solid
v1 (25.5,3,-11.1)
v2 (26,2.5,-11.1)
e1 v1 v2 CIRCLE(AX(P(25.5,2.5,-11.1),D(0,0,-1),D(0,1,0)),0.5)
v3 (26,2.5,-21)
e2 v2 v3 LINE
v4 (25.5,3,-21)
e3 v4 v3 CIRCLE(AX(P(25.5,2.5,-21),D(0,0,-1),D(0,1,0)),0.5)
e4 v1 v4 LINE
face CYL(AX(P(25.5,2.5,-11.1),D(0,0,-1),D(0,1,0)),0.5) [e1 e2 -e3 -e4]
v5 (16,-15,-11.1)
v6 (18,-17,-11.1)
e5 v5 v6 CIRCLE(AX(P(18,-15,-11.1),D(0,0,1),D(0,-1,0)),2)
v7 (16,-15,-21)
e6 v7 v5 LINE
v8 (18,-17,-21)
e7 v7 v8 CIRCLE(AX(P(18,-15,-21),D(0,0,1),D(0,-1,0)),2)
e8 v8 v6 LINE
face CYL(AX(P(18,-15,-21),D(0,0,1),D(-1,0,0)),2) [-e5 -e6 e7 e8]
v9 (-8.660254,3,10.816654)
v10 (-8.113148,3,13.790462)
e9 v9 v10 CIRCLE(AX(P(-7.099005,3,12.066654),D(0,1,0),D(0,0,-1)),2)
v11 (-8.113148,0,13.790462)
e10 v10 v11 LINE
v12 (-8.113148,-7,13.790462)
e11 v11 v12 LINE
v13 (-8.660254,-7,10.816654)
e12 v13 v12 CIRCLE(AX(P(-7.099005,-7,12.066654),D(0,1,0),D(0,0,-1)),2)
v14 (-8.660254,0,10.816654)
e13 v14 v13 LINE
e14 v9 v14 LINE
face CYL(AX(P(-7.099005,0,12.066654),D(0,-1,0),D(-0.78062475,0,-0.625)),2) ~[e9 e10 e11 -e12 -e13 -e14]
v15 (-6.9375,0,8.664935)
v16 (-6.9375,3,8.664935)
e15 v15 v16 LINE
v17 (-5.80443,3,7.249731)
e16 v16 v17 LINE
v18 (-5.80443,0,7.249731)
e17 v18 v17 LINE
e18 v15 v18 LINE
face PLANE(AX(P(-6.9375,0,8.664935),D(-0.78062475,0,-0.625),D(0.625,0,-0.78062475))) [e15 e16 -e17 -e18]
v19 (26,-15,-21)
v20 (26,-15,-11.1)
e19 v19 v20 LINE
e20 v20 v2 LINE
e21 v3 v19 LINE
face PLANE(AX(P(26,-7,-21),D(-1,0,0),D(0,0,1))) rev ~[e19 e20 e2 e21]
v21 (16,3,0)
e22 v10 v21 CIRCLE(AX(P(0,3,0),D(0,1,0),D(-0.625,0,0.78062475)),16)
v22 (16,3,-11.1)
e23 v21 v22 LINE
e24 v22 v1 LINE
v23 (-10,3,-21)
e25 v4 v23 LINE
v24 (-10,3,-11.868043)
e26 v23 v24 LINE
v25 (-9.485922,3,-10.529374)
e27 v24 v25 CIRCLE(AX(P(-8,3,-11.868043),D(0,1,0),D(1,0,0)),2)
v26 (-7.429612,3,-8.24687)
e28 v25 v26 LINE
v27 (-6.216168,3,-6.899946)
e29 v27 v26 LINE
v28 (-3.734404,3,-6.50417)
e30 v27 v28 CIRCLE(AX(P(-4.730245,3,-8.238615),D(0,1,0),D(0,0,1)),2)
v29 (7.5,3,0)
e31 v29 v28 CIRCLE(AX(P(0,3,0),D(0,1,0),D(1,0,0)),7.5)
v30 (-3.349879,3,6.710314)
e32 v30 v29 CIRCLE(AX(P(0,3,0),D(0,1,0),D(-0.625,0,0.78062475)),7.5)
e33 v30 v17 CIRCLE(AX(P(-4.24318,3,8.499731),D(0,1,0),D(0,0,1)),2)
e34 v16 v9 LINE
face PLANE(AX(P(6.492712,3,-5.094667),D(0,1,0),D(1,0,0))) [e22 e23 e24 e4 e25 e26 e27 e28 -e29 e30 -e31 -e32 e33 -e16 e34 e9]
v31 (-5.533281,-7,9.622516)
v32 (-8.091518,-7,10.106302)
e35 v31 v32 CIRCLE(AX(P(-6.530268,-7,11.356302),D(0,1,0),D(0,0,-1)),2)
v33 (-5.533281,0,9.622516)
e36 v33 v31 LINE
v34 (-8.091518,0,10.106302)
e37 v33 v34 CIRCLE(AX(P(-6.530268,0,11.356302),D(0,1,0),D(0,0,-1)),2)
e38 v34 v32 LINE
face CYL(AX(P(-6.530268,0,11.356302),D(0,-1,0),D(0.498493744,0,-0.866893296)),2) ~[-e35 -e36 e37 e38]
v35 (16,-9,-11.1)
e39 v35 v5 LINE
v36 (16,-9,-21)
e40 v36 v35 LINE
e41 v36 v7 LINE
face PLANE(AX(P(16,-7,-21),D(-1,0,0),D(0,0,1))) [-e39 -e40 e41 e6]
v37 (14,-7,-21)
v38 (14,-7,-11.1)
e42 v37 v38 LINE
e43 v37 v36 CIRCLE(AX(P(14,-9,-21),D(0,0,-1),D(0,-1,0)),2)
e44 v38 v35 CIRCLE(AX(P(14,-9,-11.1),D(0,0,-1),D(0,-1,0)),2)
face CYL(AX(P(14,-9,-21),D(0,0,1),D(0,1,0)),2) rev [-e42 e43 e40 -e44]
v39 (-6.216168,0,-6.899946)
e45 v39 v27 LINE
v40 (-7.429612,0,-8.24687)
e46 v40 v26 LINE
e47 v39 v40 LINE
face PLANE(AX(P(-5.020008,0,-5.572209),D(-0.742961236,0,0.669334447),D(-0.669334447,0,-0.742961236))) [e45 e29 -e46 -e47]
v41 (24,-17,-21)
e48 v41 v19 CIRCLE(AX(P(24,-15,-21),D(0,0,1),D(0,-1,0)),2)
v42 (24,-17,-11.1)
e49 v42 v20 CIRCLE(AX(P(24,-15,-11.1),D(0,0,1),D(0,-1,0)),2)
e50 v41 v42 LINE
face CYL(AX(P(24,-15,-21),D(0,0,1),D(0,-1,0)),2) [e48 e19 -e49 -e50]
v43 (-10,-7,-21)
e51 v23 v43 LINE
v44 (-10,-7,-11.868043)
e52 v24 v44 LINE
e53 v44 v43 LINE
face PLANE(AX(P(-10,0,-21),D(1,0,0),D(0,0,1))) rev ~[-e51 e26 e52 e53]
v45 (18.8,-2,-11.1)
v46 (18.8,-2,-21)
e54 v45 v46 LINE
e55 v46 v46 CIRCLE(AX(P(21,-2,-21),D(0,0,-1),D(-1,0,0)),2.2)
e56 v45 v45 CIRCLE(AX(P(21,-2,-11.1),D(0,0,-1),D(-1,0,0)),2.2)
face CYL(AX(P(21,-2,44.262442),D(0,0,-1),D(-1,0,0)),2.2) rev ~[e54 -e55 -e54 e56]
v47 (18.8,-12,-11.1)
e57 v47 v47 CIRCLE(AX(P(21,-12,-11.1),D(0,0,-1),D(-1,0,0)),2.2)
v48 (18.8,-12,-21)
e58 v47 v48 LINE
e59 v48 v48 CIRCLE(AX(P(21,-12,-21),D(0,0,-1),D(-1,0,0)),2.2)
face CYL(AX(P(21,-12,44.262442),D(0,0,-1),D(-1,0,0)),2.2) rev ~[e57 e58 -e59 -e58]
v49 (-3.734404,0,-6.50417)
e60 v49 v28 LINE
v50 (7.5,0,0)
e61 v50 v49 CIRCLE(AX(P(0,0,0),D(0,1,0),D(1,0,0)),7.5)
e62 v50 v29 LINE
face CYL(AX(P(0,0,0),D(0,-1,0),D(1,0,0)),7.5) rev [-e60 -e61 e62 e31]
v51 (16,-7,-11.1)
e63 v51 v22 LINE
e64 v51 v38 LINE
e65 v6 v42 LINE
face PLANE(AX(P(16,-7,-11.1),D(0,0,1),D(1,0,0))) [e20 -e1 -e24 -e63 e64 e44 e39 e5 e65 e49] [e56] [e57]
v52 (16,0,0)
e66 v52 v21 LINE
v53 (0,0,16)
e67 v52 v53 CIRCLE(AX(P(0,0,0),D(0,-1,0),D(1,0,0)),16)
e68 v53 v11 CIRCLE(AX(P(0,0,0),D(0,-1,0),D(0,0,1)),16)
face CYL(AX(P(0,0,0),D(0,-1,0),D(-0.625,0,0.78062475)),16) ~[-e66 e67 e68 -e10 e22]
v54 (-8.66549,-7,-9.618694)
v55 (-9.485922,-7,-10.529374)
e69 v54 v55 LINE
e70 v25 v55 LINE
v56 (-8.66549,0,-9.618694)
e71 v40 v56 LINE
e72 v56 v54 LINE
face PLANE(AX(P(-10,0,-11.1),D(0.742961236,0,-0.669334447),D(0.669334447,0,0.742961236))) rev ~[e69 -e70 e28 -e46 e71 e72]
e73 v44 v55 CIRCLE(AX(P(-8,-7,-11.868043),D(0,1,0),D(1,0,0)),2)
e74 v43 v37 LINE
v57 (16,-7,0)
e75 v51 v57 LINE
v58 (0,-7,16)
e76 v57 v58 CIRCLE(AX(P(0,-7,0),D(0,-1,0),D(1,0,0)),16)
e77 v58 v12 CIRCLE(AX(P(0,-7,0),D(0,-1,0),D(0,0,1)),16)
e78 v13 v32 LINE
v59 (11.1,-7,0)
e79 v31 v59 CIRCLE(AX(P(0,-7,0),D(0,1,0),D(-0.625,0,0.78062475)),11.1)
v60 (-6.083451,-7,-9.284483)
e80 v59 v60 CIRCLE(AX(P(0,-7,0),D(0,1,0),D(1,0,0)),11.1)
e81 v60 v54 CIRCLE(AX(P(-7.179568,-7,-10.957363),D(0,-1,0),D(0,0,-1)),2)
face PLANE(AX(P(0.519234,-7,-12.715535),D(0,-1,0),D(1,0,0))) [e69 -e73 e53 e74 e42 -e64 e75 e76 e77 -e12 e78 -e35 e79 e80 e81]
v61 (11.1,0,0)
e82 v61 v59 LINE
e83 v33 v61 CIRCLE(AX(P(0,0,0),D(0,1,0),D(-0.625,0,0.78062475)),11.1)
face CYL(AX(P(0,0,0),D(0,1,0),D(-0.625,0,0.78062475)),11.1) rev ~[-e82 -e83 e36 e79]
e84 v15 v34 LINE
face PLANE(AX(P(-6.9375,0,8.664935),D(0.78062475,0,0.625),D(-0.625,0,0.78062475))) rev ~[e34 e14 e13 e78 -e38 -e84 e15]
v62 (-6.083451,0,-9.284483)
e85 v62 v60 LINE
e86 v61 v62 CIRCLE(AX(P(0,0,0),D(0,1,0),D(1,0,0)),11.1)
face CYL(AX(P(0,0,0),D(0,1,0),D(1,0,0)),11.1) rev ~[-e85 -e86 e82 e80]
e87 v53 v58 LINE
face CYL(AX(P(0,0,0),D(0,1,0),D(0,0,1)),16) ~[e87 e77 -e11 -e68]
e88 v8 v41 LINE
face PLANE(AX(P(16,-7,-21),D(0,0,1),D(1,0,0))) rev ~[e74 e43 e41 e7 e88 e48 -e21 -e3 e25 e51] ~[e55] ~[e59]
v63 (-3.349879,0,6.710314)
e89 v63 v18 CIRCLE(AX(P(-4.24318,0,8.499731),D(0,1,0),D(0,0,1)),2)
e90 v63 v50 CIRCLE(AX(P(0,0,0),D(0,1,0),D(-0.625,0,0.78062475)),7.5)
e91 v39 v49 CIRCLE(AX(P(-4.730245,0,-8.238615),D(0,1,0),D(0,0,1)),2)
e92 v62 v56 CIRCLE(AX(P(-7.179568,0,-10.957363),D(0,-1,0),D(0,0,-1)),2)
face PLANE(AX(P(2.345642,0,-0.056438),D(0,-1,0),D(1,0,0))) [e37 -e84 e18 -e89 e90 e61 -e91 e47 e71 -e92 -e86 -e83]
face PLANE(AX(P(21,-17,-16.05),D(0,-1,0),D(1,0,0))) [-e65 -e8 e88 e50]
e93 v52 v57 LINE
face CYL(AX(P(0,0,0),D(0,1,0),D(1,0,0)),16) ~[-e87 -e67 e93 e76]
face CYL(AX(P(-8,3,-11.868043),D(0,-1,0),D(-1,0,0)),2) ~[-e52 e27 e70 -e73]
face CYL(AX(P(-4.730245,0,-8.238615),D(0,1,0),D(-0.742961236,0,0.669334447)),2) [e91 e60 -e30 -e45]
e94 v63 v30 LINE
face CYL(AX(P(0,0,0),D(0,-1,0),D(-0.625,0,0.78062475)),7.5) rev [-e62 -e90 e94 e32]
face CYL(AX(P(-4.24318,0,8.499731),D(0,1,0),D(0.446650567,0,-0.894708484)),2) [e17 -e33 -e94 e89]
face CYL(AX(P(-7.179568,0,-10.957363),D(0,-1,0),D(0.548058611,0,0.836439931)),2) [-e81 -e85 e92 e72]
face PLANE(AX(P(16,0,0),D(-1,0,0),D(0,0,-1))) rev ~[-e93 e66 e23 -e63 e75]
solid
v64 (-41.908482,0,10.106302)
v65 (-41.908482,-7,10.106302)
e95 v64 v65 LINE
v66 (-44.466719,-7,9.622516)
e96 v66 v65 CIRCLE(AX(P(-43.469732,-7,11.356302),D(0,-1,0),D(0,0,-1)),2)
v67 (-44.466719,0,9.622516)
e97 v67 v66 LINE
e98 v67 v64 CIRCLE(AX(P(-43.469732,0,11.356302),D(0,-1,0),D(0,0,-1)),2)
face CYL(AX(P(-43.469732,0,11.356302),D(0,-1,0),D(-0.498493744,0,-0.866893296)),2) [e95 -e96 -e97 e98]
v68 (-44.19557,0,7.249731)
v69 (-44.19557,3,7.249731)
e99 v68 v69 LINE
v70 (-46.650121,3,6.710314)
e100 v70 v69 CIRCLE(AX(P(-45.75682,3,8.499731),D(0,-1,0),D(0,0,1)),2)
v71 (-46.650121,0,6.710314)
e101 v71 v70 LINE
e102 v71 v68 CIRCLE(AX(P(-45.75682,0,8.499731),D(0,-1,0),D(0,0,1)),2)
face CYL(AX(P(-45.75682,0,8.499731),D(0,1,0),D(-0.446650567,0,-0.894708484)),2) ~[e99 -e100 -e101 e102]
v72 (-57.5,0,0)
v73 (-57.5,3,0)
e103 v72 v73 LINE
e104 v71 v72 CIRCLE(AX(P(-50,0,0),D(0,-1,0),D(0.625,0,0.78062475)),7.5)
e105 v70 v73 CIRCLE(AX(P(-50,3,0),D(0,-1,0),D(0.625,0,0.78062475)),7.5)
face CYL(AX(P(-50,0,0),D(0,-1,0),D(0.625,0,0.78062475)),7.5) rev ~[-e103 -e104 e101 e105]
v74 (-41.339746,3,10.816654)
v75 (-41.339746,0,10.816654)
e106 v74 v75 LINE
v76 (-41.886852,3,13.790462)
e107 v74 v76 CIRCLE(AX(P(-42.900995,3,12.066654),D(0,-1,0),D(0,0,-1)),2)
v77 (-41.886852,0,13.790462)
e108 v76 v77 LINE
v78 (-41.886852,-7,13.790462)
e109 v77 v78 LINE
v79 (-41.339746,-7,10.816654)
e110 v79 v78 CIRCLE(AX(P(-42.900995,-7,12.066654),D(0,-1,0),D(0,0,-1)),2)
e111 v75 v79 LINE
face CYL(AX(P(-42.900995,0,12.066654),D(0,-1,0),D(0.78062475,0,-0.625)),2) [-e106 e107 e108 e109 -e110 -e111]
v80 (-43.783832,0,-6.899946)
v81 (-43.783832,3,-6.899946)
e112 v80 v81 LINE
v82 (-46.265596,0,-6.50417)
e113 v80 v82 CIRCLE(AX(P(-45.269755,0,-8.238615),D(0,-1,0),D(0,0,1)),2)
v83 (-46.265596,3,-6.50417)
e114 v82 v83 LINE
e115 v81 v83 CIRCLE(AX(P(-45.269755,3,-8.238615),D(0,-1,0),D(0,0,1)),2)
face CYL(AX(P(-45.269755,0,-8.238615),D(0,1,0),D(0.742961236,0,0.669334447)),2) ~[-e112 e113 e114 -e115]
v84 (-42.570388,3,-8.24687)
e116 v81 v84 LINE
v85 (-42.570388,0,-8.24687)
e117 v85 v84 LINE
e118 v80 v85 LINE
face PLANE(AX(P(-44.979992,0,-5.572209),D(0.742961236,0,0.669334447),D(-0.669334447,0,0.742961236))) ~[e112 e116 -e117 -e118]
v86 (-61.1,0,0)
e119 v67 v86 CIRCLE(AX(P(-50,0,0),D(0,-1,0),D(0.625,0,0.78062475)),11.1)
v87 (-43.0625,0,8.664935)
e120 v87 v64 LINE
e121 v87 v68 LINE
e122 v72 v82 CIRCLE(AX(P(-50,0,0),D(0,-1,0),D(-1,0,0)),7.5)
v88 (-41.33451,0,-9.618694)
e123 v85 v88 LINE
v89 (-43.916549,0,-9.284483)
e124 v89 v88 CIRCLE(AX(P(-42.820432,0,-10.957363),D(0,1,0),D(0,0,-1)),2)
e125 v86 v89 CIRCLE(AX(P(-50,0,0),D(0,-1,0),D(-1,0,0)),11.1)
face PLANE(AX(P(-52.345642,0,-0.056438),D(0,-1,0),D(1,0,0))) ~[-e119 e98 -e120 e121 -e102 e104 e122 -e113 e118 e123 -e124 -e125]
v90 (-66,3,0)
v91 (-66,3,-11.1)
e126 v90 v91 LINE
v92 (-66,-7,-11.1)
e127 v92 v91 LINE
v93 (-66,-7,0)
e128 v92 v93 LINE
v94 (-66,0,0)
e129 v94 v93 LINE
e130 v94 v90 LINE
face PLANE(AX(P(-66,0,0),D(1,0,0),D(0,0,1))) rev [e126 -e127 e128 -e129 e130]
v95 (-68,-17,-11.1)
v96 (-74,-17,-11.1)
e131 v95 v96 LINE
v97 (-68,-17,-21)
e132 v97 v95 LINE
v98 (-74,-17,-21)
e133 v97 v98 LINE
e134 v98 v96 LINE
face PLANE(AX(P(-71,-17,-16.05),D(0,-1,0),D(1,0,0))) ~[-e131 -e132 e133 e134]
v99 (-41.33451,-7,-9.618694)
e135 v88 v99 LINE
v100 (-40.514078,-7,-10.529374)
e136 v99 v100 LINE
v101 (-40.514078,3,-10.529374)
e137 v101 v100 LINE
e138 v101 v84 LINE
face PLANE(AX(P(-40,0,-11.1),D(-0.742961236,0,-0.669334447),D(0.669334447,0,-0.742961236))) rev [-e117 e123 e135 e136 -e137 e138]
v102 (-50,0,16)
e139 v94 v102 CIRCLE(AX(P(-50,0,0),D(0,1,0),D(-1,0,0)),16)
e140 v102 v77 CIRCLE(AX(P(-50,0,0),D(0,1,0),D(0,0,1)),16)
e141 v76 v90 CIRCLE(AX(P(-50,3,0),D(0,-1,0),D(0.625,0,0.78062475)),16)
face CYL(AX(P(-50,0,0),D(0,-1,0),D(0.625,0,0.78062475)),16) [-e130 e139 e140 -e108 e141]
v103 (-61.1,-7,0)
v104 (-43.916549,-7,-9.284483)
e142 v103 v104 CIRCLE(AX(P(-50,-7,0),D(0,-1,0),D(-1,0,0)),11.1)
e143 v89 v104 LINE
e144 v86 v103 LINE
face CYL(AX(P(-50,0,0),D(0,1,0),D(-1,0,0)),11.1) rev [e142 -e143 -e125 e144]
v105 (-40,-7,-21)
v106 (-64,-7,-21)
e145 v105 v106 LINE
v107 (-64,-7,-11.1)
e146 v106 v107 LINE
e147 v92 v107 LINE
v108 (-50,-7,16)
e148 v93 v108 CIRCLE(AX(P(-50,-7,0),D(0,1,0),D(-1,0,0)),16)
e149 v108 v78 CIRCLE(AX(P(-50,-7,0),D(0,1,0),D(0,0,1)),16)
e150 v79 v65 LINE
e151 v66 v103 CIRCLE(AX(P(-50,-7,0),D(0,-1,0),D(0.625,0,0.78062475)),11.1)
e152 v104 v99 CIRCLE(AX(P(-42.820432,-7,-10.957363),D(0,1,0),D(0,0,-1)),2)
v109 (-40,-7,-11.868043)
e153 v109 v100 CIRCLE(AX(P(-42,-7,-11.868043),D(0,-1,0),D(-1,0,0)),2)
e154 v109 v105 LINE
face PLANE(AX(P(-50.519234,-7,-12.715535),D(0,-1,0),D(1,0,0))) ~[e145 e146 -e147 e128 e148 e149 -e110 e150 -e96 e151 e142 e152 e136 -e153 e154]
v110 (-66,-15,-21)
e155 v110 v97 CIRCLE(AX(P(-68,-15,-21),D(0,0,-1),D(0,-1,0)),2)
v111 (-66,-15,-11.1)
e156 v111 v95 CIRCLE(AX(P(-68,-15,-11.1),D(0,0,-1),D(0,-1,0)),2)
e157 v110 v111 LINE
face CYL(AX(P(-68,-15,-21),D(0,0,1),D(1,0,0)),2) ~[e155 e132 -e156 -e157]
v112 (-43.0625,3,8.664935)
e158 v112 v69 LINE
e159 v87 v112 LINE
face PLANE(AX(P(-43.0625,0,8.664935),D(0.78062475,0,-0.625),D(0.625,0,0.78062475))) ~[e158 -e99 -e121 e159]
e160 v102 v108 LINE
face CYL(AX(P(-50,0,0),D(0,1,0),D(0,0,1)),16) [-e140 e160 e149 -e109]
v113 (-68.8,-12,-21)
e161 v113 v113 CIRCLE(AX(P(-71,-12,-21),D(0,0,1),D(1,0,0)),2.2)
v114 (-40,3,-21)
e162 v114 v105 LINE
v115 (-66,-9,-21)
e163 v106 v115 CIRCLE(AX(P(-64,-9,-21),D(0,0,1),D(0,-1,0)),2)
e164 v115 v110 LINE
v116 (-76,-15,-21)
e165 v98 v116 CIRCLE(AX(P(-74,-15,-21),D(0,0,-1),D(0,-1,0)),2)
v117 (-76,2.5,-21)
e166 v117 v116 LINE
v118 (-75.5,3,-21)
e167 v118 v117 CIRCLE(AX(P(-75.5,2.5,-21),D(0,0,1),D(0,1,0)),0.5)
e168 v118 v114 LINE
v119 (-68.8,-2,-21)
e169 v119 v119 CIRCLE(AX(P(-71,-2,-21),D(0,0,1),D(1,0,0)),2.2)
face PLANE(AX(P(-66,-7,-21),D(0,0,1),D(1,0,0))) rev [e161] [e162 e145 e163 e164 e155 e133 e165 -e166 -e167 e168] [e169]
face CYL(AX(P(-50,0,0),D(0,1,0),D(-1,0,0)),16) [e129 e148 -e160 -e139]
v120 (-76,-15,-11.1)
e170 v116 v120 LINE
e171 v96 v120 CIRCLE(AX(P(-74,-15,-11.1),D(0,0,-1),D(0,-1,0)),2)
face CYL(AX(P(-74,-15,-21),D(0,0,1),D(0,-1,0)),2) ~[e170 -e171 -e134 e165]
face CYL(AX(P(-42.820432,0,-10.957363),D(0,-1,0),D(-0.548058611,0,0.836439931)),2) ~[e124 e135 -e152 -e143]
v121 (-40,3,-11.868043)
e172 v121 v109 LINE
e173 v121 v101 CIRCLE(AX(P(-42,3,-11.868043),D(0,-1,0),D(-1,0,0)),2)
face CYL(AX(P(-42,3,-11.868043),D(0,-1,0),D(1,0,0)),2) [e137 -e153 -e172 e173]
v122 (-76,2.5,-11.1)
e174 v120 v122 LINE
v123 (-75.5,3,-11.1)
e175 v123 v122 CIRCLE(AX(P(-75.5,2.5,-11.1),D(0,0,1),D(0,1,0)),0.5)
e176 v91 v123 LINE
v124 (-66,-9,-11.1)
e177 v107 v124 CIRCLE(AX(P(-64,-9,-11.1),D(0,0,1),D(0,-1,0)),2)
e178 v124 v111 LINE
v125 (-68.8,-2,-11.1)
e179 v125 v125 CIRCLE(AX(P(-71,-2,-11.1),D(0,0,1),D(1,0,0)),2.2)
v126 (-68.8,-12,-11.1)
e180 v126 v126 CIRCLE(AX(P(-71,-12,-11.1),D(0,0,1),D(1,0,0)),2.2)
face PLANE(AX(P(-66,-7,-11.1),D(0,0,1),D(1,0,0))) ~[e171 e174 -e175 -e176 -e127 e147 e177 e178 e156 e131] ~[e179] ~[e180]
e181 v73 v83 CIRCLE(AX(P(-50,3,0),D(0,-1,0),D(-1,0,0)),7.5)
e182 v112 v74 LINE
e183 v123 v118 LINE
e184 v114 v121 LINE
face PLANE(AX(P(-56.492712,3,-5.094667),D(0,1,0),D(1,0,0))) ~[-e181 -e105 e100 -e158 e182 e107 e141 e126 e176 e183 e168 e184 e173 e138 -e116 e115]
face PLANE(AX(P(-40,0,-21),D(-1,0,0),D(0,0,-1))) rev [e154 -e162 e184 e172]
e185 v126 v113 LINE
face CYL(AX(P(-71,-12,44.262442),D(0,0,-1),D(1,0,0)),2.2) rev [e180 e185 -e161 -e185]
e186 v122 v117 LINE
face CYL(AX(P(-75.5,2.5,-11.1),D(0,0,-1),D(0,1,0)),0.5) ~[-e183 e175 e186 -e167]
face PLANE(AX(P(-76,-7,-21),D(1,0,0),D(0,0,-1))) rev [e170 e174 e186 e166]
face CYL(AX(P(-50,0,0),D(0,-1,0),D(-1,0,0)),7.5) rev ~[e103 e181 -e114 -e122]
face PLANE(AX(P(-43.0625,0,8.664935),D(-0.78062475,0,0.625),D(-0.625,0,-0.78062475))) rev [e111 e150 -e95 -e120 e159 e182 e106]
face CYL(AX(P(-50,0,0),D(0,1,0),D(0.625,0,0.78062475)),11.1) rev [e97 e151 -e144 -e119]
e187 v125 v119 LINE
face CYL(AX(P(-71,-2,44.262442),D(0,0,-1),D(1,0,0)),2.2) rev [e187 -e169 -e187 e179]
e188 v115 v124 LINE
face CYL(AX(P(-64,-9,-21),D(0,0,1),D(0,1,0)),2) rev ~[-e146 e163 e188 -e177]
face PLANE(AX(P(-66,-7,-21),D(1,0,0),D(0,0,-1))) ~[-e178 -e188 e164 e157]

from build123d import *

# Parameters (mm, degrees)
F1_DEPTH = 7
F2_DEPTH = 3
F3_W     = 10
F3_H     = 9.9
F4_DEPTH = 10
F6_D     = 4.4
F7_R     = 2
F8_R     = 2
F9_R     = 0.5


# Not quite as in the source:
# - a feature names something its author has since deleted; it is built from what else it names


with BuildPart() as f1:
    # F0 (on Front) → F1 (new body)
    with BuildSketch(Plane.XZ):
        with BuildLine():
            ThreePointArc((-10, -12.4899959968), (1.031140389, -15.9667388498), (11.5234543432, -11.1))
            Line((11.5234543432, -11.1), (0, -11.1))
            Line((0, -11.1), (-10, -11.1))
            Line((-10, -11.1), (-10, -12.4899959968))
        make_face()
        with BuildLine():
            Line((26, -21), (26, -11.1))
            Line((26, -11.1), (16, -11.1))
            Line((16, -11.1), (11.5234543432, -11.1))
            ThreePointArc((11.5234543432, -11.1), (1.031140389, -15.9667388498), (-10, -12.4899959968))
            Line((-10, -12.4899959968), (-10, -21))
            Line((-10, -21), (26, -21))
        make_face()
        with BuildLine():
            Line((16, -11.1), (16, 0))
            ThreePointArc((16, 0), (14.8387207921, -5.9843433436), (11.5234543432, -11.1))
            Line((11.5234543432, -11.1), (16, -11.1))
        make_face()
        with BuildLine():
            ThreePointArc((16, 0), (11.313708499, 11.313708499), (0, 16))
            ThreePointArc((0, 16), (-5.2990595416, 15.0970185128), (-10, 12.4899959968))
            Line((-10, 12.4899959968), (-6.9375, 8.6649347228))
            ThreePointArc((-6.9375, 8.6649347228), (4.806440991, 10.0054047894), (11.1, 0))
            ThreePointArc((11.1, 0), (7.8488852712, -7.8488852712), (0, -11.1))
            Line((0, -11.1), (11.5234543432, -11.1))
            ThreePointArc((11.5234543432, -11.1), (14.8387207921, -5.9843433436), (16, 0))
        make_face()
        with BuildLine():
            Line((-7.4296123602, -8.2468697199), (-10, -11.1))
            Line((-10, -11.1), (0, -11.1))
            ThreePointArc((0, -11.1), (-3.9793055996, -10.3621970134), (-7.4296123602, -8.2468697199))
        make_face()
    extrude(amount=F1_DEPTH)

    # F1_face (on face) + F0 (on Front) → F2 (join)
    with BuildSketch(Plane(origin=(7.471830613, 0, -8.1748565064), x_dir=(1, 0, 0), z_dir=(0, 1, 0))):
        with BuildLine():
            Line((-17.471830613, 2.9251434936), (-14.9014429732, 0.0720132135))
            ThreePointArc((-14.9014429732, 0.0720132135), (3.6234729777, -7.8519970471), (-14.409330613, -16.8397912292))
            Line((-14.409330613, -16.8397912292), (-17.471830613, -20.6648525032))
            ThreePointArc((-17.471830613, -20.6648525032), (-0.5436273827, -22.5970616082), (8.528169387, -8.1748565064))
            Line((8.528169387, -8.1748565064), (8.528169387, 2.9251434936))
            Line((8.528169387, 2.9251434936), (18.528169387, 2.9251434936))
            Line((18.528169387, 2.9251434936), (18.528169387, 12.8251434936))
            Line((18.528169387, 12.8251434936), (-17.471830613, 12.8251434936))
            Line((-17.471830613, 12.8251434936), (-17.471830613, 2.9251434936))
        make_face()
    with BuildSketch(Plane.XZ):
        with BuildLine():
            ThreePointArc((11.1, 0), (4.806440991, 10.0054047894), (-6.9375, 8.6649347228))
            Line((-6.9375, 8.6649347228), (-4.6875, 5.8546856235))
            ThreePointArc((-4.6875, 5.8546856235), (3.2475952642, 6.7604086415), (7.5, 0))
            ThreePointArc((7.5, 0), (3.0495850016, -6.8520092906), (-5.0200083515, -5.5722092702))
            Line((-5.0200083515, -5.5722092702), (-7.4296123602, -8.2468697199))
            ThreePointArc((-7.4296123602, -8.2468697199), (-3.9793055996, -10.3621970134), (0, -11.1))
            ThreePointArc((0, -11.1), (7.8488852712, -7.8488852712), (11.1, 0))
        make_face()
    extrude(amount=F2_DEPTH, dir=(0, 1, 0))

    # F3 (on face) → F4 (join)
    with BuildSketch(Plane.XZ.offset(7)):
        with Locations((21, -16.05)):
            Rectangle(F3_W, F3_H)
    extrude(amount=F4_DEPTH)

    # F6 (through all)
    with Locations(Plane.XY.offset(-11.1)):
        with Locations((21, -2), (21, -12)):
            Hole(F6_D / 2)

    # F7
    f7_edges = [f1.edges().sort_by_distance(p)[0] for p in [
        (-10, -2, 12.489996),
        (-4.6875, 1.5, 5.854686),
        (-5.020008, 1.5, -5.572209),
        (-7.429612, -3.5, -8.24687),
        (-6.9375, -3.5, 8.664935),
        (-10, -2, -11.1),
    ]]
    fillet(f7_edges, radius=F7_R)

    # F8
    f8_edges = [f1.edges().sort_by_distance(p)[0] for p in [
        (16, -17, -16.05),
        (16, -7, -16.05),
        (26, -17, -16.05),
    ]]
    fillet(f8_edges, radius=F8_R)

    # F9
    f9_edges = [f1.edges().sort_by_distance(p)[0] for p in [
        (26, 3, -16.05),
    ]]
    fillet(f9_edges, radius=F9_R)


with BuildPart() as f11_1:
    # F11: instance of F1
    add(f1.part.mirror(Plane.YZ.offset(-25)))


solid = Compound([f1.part, f11_1.part])
